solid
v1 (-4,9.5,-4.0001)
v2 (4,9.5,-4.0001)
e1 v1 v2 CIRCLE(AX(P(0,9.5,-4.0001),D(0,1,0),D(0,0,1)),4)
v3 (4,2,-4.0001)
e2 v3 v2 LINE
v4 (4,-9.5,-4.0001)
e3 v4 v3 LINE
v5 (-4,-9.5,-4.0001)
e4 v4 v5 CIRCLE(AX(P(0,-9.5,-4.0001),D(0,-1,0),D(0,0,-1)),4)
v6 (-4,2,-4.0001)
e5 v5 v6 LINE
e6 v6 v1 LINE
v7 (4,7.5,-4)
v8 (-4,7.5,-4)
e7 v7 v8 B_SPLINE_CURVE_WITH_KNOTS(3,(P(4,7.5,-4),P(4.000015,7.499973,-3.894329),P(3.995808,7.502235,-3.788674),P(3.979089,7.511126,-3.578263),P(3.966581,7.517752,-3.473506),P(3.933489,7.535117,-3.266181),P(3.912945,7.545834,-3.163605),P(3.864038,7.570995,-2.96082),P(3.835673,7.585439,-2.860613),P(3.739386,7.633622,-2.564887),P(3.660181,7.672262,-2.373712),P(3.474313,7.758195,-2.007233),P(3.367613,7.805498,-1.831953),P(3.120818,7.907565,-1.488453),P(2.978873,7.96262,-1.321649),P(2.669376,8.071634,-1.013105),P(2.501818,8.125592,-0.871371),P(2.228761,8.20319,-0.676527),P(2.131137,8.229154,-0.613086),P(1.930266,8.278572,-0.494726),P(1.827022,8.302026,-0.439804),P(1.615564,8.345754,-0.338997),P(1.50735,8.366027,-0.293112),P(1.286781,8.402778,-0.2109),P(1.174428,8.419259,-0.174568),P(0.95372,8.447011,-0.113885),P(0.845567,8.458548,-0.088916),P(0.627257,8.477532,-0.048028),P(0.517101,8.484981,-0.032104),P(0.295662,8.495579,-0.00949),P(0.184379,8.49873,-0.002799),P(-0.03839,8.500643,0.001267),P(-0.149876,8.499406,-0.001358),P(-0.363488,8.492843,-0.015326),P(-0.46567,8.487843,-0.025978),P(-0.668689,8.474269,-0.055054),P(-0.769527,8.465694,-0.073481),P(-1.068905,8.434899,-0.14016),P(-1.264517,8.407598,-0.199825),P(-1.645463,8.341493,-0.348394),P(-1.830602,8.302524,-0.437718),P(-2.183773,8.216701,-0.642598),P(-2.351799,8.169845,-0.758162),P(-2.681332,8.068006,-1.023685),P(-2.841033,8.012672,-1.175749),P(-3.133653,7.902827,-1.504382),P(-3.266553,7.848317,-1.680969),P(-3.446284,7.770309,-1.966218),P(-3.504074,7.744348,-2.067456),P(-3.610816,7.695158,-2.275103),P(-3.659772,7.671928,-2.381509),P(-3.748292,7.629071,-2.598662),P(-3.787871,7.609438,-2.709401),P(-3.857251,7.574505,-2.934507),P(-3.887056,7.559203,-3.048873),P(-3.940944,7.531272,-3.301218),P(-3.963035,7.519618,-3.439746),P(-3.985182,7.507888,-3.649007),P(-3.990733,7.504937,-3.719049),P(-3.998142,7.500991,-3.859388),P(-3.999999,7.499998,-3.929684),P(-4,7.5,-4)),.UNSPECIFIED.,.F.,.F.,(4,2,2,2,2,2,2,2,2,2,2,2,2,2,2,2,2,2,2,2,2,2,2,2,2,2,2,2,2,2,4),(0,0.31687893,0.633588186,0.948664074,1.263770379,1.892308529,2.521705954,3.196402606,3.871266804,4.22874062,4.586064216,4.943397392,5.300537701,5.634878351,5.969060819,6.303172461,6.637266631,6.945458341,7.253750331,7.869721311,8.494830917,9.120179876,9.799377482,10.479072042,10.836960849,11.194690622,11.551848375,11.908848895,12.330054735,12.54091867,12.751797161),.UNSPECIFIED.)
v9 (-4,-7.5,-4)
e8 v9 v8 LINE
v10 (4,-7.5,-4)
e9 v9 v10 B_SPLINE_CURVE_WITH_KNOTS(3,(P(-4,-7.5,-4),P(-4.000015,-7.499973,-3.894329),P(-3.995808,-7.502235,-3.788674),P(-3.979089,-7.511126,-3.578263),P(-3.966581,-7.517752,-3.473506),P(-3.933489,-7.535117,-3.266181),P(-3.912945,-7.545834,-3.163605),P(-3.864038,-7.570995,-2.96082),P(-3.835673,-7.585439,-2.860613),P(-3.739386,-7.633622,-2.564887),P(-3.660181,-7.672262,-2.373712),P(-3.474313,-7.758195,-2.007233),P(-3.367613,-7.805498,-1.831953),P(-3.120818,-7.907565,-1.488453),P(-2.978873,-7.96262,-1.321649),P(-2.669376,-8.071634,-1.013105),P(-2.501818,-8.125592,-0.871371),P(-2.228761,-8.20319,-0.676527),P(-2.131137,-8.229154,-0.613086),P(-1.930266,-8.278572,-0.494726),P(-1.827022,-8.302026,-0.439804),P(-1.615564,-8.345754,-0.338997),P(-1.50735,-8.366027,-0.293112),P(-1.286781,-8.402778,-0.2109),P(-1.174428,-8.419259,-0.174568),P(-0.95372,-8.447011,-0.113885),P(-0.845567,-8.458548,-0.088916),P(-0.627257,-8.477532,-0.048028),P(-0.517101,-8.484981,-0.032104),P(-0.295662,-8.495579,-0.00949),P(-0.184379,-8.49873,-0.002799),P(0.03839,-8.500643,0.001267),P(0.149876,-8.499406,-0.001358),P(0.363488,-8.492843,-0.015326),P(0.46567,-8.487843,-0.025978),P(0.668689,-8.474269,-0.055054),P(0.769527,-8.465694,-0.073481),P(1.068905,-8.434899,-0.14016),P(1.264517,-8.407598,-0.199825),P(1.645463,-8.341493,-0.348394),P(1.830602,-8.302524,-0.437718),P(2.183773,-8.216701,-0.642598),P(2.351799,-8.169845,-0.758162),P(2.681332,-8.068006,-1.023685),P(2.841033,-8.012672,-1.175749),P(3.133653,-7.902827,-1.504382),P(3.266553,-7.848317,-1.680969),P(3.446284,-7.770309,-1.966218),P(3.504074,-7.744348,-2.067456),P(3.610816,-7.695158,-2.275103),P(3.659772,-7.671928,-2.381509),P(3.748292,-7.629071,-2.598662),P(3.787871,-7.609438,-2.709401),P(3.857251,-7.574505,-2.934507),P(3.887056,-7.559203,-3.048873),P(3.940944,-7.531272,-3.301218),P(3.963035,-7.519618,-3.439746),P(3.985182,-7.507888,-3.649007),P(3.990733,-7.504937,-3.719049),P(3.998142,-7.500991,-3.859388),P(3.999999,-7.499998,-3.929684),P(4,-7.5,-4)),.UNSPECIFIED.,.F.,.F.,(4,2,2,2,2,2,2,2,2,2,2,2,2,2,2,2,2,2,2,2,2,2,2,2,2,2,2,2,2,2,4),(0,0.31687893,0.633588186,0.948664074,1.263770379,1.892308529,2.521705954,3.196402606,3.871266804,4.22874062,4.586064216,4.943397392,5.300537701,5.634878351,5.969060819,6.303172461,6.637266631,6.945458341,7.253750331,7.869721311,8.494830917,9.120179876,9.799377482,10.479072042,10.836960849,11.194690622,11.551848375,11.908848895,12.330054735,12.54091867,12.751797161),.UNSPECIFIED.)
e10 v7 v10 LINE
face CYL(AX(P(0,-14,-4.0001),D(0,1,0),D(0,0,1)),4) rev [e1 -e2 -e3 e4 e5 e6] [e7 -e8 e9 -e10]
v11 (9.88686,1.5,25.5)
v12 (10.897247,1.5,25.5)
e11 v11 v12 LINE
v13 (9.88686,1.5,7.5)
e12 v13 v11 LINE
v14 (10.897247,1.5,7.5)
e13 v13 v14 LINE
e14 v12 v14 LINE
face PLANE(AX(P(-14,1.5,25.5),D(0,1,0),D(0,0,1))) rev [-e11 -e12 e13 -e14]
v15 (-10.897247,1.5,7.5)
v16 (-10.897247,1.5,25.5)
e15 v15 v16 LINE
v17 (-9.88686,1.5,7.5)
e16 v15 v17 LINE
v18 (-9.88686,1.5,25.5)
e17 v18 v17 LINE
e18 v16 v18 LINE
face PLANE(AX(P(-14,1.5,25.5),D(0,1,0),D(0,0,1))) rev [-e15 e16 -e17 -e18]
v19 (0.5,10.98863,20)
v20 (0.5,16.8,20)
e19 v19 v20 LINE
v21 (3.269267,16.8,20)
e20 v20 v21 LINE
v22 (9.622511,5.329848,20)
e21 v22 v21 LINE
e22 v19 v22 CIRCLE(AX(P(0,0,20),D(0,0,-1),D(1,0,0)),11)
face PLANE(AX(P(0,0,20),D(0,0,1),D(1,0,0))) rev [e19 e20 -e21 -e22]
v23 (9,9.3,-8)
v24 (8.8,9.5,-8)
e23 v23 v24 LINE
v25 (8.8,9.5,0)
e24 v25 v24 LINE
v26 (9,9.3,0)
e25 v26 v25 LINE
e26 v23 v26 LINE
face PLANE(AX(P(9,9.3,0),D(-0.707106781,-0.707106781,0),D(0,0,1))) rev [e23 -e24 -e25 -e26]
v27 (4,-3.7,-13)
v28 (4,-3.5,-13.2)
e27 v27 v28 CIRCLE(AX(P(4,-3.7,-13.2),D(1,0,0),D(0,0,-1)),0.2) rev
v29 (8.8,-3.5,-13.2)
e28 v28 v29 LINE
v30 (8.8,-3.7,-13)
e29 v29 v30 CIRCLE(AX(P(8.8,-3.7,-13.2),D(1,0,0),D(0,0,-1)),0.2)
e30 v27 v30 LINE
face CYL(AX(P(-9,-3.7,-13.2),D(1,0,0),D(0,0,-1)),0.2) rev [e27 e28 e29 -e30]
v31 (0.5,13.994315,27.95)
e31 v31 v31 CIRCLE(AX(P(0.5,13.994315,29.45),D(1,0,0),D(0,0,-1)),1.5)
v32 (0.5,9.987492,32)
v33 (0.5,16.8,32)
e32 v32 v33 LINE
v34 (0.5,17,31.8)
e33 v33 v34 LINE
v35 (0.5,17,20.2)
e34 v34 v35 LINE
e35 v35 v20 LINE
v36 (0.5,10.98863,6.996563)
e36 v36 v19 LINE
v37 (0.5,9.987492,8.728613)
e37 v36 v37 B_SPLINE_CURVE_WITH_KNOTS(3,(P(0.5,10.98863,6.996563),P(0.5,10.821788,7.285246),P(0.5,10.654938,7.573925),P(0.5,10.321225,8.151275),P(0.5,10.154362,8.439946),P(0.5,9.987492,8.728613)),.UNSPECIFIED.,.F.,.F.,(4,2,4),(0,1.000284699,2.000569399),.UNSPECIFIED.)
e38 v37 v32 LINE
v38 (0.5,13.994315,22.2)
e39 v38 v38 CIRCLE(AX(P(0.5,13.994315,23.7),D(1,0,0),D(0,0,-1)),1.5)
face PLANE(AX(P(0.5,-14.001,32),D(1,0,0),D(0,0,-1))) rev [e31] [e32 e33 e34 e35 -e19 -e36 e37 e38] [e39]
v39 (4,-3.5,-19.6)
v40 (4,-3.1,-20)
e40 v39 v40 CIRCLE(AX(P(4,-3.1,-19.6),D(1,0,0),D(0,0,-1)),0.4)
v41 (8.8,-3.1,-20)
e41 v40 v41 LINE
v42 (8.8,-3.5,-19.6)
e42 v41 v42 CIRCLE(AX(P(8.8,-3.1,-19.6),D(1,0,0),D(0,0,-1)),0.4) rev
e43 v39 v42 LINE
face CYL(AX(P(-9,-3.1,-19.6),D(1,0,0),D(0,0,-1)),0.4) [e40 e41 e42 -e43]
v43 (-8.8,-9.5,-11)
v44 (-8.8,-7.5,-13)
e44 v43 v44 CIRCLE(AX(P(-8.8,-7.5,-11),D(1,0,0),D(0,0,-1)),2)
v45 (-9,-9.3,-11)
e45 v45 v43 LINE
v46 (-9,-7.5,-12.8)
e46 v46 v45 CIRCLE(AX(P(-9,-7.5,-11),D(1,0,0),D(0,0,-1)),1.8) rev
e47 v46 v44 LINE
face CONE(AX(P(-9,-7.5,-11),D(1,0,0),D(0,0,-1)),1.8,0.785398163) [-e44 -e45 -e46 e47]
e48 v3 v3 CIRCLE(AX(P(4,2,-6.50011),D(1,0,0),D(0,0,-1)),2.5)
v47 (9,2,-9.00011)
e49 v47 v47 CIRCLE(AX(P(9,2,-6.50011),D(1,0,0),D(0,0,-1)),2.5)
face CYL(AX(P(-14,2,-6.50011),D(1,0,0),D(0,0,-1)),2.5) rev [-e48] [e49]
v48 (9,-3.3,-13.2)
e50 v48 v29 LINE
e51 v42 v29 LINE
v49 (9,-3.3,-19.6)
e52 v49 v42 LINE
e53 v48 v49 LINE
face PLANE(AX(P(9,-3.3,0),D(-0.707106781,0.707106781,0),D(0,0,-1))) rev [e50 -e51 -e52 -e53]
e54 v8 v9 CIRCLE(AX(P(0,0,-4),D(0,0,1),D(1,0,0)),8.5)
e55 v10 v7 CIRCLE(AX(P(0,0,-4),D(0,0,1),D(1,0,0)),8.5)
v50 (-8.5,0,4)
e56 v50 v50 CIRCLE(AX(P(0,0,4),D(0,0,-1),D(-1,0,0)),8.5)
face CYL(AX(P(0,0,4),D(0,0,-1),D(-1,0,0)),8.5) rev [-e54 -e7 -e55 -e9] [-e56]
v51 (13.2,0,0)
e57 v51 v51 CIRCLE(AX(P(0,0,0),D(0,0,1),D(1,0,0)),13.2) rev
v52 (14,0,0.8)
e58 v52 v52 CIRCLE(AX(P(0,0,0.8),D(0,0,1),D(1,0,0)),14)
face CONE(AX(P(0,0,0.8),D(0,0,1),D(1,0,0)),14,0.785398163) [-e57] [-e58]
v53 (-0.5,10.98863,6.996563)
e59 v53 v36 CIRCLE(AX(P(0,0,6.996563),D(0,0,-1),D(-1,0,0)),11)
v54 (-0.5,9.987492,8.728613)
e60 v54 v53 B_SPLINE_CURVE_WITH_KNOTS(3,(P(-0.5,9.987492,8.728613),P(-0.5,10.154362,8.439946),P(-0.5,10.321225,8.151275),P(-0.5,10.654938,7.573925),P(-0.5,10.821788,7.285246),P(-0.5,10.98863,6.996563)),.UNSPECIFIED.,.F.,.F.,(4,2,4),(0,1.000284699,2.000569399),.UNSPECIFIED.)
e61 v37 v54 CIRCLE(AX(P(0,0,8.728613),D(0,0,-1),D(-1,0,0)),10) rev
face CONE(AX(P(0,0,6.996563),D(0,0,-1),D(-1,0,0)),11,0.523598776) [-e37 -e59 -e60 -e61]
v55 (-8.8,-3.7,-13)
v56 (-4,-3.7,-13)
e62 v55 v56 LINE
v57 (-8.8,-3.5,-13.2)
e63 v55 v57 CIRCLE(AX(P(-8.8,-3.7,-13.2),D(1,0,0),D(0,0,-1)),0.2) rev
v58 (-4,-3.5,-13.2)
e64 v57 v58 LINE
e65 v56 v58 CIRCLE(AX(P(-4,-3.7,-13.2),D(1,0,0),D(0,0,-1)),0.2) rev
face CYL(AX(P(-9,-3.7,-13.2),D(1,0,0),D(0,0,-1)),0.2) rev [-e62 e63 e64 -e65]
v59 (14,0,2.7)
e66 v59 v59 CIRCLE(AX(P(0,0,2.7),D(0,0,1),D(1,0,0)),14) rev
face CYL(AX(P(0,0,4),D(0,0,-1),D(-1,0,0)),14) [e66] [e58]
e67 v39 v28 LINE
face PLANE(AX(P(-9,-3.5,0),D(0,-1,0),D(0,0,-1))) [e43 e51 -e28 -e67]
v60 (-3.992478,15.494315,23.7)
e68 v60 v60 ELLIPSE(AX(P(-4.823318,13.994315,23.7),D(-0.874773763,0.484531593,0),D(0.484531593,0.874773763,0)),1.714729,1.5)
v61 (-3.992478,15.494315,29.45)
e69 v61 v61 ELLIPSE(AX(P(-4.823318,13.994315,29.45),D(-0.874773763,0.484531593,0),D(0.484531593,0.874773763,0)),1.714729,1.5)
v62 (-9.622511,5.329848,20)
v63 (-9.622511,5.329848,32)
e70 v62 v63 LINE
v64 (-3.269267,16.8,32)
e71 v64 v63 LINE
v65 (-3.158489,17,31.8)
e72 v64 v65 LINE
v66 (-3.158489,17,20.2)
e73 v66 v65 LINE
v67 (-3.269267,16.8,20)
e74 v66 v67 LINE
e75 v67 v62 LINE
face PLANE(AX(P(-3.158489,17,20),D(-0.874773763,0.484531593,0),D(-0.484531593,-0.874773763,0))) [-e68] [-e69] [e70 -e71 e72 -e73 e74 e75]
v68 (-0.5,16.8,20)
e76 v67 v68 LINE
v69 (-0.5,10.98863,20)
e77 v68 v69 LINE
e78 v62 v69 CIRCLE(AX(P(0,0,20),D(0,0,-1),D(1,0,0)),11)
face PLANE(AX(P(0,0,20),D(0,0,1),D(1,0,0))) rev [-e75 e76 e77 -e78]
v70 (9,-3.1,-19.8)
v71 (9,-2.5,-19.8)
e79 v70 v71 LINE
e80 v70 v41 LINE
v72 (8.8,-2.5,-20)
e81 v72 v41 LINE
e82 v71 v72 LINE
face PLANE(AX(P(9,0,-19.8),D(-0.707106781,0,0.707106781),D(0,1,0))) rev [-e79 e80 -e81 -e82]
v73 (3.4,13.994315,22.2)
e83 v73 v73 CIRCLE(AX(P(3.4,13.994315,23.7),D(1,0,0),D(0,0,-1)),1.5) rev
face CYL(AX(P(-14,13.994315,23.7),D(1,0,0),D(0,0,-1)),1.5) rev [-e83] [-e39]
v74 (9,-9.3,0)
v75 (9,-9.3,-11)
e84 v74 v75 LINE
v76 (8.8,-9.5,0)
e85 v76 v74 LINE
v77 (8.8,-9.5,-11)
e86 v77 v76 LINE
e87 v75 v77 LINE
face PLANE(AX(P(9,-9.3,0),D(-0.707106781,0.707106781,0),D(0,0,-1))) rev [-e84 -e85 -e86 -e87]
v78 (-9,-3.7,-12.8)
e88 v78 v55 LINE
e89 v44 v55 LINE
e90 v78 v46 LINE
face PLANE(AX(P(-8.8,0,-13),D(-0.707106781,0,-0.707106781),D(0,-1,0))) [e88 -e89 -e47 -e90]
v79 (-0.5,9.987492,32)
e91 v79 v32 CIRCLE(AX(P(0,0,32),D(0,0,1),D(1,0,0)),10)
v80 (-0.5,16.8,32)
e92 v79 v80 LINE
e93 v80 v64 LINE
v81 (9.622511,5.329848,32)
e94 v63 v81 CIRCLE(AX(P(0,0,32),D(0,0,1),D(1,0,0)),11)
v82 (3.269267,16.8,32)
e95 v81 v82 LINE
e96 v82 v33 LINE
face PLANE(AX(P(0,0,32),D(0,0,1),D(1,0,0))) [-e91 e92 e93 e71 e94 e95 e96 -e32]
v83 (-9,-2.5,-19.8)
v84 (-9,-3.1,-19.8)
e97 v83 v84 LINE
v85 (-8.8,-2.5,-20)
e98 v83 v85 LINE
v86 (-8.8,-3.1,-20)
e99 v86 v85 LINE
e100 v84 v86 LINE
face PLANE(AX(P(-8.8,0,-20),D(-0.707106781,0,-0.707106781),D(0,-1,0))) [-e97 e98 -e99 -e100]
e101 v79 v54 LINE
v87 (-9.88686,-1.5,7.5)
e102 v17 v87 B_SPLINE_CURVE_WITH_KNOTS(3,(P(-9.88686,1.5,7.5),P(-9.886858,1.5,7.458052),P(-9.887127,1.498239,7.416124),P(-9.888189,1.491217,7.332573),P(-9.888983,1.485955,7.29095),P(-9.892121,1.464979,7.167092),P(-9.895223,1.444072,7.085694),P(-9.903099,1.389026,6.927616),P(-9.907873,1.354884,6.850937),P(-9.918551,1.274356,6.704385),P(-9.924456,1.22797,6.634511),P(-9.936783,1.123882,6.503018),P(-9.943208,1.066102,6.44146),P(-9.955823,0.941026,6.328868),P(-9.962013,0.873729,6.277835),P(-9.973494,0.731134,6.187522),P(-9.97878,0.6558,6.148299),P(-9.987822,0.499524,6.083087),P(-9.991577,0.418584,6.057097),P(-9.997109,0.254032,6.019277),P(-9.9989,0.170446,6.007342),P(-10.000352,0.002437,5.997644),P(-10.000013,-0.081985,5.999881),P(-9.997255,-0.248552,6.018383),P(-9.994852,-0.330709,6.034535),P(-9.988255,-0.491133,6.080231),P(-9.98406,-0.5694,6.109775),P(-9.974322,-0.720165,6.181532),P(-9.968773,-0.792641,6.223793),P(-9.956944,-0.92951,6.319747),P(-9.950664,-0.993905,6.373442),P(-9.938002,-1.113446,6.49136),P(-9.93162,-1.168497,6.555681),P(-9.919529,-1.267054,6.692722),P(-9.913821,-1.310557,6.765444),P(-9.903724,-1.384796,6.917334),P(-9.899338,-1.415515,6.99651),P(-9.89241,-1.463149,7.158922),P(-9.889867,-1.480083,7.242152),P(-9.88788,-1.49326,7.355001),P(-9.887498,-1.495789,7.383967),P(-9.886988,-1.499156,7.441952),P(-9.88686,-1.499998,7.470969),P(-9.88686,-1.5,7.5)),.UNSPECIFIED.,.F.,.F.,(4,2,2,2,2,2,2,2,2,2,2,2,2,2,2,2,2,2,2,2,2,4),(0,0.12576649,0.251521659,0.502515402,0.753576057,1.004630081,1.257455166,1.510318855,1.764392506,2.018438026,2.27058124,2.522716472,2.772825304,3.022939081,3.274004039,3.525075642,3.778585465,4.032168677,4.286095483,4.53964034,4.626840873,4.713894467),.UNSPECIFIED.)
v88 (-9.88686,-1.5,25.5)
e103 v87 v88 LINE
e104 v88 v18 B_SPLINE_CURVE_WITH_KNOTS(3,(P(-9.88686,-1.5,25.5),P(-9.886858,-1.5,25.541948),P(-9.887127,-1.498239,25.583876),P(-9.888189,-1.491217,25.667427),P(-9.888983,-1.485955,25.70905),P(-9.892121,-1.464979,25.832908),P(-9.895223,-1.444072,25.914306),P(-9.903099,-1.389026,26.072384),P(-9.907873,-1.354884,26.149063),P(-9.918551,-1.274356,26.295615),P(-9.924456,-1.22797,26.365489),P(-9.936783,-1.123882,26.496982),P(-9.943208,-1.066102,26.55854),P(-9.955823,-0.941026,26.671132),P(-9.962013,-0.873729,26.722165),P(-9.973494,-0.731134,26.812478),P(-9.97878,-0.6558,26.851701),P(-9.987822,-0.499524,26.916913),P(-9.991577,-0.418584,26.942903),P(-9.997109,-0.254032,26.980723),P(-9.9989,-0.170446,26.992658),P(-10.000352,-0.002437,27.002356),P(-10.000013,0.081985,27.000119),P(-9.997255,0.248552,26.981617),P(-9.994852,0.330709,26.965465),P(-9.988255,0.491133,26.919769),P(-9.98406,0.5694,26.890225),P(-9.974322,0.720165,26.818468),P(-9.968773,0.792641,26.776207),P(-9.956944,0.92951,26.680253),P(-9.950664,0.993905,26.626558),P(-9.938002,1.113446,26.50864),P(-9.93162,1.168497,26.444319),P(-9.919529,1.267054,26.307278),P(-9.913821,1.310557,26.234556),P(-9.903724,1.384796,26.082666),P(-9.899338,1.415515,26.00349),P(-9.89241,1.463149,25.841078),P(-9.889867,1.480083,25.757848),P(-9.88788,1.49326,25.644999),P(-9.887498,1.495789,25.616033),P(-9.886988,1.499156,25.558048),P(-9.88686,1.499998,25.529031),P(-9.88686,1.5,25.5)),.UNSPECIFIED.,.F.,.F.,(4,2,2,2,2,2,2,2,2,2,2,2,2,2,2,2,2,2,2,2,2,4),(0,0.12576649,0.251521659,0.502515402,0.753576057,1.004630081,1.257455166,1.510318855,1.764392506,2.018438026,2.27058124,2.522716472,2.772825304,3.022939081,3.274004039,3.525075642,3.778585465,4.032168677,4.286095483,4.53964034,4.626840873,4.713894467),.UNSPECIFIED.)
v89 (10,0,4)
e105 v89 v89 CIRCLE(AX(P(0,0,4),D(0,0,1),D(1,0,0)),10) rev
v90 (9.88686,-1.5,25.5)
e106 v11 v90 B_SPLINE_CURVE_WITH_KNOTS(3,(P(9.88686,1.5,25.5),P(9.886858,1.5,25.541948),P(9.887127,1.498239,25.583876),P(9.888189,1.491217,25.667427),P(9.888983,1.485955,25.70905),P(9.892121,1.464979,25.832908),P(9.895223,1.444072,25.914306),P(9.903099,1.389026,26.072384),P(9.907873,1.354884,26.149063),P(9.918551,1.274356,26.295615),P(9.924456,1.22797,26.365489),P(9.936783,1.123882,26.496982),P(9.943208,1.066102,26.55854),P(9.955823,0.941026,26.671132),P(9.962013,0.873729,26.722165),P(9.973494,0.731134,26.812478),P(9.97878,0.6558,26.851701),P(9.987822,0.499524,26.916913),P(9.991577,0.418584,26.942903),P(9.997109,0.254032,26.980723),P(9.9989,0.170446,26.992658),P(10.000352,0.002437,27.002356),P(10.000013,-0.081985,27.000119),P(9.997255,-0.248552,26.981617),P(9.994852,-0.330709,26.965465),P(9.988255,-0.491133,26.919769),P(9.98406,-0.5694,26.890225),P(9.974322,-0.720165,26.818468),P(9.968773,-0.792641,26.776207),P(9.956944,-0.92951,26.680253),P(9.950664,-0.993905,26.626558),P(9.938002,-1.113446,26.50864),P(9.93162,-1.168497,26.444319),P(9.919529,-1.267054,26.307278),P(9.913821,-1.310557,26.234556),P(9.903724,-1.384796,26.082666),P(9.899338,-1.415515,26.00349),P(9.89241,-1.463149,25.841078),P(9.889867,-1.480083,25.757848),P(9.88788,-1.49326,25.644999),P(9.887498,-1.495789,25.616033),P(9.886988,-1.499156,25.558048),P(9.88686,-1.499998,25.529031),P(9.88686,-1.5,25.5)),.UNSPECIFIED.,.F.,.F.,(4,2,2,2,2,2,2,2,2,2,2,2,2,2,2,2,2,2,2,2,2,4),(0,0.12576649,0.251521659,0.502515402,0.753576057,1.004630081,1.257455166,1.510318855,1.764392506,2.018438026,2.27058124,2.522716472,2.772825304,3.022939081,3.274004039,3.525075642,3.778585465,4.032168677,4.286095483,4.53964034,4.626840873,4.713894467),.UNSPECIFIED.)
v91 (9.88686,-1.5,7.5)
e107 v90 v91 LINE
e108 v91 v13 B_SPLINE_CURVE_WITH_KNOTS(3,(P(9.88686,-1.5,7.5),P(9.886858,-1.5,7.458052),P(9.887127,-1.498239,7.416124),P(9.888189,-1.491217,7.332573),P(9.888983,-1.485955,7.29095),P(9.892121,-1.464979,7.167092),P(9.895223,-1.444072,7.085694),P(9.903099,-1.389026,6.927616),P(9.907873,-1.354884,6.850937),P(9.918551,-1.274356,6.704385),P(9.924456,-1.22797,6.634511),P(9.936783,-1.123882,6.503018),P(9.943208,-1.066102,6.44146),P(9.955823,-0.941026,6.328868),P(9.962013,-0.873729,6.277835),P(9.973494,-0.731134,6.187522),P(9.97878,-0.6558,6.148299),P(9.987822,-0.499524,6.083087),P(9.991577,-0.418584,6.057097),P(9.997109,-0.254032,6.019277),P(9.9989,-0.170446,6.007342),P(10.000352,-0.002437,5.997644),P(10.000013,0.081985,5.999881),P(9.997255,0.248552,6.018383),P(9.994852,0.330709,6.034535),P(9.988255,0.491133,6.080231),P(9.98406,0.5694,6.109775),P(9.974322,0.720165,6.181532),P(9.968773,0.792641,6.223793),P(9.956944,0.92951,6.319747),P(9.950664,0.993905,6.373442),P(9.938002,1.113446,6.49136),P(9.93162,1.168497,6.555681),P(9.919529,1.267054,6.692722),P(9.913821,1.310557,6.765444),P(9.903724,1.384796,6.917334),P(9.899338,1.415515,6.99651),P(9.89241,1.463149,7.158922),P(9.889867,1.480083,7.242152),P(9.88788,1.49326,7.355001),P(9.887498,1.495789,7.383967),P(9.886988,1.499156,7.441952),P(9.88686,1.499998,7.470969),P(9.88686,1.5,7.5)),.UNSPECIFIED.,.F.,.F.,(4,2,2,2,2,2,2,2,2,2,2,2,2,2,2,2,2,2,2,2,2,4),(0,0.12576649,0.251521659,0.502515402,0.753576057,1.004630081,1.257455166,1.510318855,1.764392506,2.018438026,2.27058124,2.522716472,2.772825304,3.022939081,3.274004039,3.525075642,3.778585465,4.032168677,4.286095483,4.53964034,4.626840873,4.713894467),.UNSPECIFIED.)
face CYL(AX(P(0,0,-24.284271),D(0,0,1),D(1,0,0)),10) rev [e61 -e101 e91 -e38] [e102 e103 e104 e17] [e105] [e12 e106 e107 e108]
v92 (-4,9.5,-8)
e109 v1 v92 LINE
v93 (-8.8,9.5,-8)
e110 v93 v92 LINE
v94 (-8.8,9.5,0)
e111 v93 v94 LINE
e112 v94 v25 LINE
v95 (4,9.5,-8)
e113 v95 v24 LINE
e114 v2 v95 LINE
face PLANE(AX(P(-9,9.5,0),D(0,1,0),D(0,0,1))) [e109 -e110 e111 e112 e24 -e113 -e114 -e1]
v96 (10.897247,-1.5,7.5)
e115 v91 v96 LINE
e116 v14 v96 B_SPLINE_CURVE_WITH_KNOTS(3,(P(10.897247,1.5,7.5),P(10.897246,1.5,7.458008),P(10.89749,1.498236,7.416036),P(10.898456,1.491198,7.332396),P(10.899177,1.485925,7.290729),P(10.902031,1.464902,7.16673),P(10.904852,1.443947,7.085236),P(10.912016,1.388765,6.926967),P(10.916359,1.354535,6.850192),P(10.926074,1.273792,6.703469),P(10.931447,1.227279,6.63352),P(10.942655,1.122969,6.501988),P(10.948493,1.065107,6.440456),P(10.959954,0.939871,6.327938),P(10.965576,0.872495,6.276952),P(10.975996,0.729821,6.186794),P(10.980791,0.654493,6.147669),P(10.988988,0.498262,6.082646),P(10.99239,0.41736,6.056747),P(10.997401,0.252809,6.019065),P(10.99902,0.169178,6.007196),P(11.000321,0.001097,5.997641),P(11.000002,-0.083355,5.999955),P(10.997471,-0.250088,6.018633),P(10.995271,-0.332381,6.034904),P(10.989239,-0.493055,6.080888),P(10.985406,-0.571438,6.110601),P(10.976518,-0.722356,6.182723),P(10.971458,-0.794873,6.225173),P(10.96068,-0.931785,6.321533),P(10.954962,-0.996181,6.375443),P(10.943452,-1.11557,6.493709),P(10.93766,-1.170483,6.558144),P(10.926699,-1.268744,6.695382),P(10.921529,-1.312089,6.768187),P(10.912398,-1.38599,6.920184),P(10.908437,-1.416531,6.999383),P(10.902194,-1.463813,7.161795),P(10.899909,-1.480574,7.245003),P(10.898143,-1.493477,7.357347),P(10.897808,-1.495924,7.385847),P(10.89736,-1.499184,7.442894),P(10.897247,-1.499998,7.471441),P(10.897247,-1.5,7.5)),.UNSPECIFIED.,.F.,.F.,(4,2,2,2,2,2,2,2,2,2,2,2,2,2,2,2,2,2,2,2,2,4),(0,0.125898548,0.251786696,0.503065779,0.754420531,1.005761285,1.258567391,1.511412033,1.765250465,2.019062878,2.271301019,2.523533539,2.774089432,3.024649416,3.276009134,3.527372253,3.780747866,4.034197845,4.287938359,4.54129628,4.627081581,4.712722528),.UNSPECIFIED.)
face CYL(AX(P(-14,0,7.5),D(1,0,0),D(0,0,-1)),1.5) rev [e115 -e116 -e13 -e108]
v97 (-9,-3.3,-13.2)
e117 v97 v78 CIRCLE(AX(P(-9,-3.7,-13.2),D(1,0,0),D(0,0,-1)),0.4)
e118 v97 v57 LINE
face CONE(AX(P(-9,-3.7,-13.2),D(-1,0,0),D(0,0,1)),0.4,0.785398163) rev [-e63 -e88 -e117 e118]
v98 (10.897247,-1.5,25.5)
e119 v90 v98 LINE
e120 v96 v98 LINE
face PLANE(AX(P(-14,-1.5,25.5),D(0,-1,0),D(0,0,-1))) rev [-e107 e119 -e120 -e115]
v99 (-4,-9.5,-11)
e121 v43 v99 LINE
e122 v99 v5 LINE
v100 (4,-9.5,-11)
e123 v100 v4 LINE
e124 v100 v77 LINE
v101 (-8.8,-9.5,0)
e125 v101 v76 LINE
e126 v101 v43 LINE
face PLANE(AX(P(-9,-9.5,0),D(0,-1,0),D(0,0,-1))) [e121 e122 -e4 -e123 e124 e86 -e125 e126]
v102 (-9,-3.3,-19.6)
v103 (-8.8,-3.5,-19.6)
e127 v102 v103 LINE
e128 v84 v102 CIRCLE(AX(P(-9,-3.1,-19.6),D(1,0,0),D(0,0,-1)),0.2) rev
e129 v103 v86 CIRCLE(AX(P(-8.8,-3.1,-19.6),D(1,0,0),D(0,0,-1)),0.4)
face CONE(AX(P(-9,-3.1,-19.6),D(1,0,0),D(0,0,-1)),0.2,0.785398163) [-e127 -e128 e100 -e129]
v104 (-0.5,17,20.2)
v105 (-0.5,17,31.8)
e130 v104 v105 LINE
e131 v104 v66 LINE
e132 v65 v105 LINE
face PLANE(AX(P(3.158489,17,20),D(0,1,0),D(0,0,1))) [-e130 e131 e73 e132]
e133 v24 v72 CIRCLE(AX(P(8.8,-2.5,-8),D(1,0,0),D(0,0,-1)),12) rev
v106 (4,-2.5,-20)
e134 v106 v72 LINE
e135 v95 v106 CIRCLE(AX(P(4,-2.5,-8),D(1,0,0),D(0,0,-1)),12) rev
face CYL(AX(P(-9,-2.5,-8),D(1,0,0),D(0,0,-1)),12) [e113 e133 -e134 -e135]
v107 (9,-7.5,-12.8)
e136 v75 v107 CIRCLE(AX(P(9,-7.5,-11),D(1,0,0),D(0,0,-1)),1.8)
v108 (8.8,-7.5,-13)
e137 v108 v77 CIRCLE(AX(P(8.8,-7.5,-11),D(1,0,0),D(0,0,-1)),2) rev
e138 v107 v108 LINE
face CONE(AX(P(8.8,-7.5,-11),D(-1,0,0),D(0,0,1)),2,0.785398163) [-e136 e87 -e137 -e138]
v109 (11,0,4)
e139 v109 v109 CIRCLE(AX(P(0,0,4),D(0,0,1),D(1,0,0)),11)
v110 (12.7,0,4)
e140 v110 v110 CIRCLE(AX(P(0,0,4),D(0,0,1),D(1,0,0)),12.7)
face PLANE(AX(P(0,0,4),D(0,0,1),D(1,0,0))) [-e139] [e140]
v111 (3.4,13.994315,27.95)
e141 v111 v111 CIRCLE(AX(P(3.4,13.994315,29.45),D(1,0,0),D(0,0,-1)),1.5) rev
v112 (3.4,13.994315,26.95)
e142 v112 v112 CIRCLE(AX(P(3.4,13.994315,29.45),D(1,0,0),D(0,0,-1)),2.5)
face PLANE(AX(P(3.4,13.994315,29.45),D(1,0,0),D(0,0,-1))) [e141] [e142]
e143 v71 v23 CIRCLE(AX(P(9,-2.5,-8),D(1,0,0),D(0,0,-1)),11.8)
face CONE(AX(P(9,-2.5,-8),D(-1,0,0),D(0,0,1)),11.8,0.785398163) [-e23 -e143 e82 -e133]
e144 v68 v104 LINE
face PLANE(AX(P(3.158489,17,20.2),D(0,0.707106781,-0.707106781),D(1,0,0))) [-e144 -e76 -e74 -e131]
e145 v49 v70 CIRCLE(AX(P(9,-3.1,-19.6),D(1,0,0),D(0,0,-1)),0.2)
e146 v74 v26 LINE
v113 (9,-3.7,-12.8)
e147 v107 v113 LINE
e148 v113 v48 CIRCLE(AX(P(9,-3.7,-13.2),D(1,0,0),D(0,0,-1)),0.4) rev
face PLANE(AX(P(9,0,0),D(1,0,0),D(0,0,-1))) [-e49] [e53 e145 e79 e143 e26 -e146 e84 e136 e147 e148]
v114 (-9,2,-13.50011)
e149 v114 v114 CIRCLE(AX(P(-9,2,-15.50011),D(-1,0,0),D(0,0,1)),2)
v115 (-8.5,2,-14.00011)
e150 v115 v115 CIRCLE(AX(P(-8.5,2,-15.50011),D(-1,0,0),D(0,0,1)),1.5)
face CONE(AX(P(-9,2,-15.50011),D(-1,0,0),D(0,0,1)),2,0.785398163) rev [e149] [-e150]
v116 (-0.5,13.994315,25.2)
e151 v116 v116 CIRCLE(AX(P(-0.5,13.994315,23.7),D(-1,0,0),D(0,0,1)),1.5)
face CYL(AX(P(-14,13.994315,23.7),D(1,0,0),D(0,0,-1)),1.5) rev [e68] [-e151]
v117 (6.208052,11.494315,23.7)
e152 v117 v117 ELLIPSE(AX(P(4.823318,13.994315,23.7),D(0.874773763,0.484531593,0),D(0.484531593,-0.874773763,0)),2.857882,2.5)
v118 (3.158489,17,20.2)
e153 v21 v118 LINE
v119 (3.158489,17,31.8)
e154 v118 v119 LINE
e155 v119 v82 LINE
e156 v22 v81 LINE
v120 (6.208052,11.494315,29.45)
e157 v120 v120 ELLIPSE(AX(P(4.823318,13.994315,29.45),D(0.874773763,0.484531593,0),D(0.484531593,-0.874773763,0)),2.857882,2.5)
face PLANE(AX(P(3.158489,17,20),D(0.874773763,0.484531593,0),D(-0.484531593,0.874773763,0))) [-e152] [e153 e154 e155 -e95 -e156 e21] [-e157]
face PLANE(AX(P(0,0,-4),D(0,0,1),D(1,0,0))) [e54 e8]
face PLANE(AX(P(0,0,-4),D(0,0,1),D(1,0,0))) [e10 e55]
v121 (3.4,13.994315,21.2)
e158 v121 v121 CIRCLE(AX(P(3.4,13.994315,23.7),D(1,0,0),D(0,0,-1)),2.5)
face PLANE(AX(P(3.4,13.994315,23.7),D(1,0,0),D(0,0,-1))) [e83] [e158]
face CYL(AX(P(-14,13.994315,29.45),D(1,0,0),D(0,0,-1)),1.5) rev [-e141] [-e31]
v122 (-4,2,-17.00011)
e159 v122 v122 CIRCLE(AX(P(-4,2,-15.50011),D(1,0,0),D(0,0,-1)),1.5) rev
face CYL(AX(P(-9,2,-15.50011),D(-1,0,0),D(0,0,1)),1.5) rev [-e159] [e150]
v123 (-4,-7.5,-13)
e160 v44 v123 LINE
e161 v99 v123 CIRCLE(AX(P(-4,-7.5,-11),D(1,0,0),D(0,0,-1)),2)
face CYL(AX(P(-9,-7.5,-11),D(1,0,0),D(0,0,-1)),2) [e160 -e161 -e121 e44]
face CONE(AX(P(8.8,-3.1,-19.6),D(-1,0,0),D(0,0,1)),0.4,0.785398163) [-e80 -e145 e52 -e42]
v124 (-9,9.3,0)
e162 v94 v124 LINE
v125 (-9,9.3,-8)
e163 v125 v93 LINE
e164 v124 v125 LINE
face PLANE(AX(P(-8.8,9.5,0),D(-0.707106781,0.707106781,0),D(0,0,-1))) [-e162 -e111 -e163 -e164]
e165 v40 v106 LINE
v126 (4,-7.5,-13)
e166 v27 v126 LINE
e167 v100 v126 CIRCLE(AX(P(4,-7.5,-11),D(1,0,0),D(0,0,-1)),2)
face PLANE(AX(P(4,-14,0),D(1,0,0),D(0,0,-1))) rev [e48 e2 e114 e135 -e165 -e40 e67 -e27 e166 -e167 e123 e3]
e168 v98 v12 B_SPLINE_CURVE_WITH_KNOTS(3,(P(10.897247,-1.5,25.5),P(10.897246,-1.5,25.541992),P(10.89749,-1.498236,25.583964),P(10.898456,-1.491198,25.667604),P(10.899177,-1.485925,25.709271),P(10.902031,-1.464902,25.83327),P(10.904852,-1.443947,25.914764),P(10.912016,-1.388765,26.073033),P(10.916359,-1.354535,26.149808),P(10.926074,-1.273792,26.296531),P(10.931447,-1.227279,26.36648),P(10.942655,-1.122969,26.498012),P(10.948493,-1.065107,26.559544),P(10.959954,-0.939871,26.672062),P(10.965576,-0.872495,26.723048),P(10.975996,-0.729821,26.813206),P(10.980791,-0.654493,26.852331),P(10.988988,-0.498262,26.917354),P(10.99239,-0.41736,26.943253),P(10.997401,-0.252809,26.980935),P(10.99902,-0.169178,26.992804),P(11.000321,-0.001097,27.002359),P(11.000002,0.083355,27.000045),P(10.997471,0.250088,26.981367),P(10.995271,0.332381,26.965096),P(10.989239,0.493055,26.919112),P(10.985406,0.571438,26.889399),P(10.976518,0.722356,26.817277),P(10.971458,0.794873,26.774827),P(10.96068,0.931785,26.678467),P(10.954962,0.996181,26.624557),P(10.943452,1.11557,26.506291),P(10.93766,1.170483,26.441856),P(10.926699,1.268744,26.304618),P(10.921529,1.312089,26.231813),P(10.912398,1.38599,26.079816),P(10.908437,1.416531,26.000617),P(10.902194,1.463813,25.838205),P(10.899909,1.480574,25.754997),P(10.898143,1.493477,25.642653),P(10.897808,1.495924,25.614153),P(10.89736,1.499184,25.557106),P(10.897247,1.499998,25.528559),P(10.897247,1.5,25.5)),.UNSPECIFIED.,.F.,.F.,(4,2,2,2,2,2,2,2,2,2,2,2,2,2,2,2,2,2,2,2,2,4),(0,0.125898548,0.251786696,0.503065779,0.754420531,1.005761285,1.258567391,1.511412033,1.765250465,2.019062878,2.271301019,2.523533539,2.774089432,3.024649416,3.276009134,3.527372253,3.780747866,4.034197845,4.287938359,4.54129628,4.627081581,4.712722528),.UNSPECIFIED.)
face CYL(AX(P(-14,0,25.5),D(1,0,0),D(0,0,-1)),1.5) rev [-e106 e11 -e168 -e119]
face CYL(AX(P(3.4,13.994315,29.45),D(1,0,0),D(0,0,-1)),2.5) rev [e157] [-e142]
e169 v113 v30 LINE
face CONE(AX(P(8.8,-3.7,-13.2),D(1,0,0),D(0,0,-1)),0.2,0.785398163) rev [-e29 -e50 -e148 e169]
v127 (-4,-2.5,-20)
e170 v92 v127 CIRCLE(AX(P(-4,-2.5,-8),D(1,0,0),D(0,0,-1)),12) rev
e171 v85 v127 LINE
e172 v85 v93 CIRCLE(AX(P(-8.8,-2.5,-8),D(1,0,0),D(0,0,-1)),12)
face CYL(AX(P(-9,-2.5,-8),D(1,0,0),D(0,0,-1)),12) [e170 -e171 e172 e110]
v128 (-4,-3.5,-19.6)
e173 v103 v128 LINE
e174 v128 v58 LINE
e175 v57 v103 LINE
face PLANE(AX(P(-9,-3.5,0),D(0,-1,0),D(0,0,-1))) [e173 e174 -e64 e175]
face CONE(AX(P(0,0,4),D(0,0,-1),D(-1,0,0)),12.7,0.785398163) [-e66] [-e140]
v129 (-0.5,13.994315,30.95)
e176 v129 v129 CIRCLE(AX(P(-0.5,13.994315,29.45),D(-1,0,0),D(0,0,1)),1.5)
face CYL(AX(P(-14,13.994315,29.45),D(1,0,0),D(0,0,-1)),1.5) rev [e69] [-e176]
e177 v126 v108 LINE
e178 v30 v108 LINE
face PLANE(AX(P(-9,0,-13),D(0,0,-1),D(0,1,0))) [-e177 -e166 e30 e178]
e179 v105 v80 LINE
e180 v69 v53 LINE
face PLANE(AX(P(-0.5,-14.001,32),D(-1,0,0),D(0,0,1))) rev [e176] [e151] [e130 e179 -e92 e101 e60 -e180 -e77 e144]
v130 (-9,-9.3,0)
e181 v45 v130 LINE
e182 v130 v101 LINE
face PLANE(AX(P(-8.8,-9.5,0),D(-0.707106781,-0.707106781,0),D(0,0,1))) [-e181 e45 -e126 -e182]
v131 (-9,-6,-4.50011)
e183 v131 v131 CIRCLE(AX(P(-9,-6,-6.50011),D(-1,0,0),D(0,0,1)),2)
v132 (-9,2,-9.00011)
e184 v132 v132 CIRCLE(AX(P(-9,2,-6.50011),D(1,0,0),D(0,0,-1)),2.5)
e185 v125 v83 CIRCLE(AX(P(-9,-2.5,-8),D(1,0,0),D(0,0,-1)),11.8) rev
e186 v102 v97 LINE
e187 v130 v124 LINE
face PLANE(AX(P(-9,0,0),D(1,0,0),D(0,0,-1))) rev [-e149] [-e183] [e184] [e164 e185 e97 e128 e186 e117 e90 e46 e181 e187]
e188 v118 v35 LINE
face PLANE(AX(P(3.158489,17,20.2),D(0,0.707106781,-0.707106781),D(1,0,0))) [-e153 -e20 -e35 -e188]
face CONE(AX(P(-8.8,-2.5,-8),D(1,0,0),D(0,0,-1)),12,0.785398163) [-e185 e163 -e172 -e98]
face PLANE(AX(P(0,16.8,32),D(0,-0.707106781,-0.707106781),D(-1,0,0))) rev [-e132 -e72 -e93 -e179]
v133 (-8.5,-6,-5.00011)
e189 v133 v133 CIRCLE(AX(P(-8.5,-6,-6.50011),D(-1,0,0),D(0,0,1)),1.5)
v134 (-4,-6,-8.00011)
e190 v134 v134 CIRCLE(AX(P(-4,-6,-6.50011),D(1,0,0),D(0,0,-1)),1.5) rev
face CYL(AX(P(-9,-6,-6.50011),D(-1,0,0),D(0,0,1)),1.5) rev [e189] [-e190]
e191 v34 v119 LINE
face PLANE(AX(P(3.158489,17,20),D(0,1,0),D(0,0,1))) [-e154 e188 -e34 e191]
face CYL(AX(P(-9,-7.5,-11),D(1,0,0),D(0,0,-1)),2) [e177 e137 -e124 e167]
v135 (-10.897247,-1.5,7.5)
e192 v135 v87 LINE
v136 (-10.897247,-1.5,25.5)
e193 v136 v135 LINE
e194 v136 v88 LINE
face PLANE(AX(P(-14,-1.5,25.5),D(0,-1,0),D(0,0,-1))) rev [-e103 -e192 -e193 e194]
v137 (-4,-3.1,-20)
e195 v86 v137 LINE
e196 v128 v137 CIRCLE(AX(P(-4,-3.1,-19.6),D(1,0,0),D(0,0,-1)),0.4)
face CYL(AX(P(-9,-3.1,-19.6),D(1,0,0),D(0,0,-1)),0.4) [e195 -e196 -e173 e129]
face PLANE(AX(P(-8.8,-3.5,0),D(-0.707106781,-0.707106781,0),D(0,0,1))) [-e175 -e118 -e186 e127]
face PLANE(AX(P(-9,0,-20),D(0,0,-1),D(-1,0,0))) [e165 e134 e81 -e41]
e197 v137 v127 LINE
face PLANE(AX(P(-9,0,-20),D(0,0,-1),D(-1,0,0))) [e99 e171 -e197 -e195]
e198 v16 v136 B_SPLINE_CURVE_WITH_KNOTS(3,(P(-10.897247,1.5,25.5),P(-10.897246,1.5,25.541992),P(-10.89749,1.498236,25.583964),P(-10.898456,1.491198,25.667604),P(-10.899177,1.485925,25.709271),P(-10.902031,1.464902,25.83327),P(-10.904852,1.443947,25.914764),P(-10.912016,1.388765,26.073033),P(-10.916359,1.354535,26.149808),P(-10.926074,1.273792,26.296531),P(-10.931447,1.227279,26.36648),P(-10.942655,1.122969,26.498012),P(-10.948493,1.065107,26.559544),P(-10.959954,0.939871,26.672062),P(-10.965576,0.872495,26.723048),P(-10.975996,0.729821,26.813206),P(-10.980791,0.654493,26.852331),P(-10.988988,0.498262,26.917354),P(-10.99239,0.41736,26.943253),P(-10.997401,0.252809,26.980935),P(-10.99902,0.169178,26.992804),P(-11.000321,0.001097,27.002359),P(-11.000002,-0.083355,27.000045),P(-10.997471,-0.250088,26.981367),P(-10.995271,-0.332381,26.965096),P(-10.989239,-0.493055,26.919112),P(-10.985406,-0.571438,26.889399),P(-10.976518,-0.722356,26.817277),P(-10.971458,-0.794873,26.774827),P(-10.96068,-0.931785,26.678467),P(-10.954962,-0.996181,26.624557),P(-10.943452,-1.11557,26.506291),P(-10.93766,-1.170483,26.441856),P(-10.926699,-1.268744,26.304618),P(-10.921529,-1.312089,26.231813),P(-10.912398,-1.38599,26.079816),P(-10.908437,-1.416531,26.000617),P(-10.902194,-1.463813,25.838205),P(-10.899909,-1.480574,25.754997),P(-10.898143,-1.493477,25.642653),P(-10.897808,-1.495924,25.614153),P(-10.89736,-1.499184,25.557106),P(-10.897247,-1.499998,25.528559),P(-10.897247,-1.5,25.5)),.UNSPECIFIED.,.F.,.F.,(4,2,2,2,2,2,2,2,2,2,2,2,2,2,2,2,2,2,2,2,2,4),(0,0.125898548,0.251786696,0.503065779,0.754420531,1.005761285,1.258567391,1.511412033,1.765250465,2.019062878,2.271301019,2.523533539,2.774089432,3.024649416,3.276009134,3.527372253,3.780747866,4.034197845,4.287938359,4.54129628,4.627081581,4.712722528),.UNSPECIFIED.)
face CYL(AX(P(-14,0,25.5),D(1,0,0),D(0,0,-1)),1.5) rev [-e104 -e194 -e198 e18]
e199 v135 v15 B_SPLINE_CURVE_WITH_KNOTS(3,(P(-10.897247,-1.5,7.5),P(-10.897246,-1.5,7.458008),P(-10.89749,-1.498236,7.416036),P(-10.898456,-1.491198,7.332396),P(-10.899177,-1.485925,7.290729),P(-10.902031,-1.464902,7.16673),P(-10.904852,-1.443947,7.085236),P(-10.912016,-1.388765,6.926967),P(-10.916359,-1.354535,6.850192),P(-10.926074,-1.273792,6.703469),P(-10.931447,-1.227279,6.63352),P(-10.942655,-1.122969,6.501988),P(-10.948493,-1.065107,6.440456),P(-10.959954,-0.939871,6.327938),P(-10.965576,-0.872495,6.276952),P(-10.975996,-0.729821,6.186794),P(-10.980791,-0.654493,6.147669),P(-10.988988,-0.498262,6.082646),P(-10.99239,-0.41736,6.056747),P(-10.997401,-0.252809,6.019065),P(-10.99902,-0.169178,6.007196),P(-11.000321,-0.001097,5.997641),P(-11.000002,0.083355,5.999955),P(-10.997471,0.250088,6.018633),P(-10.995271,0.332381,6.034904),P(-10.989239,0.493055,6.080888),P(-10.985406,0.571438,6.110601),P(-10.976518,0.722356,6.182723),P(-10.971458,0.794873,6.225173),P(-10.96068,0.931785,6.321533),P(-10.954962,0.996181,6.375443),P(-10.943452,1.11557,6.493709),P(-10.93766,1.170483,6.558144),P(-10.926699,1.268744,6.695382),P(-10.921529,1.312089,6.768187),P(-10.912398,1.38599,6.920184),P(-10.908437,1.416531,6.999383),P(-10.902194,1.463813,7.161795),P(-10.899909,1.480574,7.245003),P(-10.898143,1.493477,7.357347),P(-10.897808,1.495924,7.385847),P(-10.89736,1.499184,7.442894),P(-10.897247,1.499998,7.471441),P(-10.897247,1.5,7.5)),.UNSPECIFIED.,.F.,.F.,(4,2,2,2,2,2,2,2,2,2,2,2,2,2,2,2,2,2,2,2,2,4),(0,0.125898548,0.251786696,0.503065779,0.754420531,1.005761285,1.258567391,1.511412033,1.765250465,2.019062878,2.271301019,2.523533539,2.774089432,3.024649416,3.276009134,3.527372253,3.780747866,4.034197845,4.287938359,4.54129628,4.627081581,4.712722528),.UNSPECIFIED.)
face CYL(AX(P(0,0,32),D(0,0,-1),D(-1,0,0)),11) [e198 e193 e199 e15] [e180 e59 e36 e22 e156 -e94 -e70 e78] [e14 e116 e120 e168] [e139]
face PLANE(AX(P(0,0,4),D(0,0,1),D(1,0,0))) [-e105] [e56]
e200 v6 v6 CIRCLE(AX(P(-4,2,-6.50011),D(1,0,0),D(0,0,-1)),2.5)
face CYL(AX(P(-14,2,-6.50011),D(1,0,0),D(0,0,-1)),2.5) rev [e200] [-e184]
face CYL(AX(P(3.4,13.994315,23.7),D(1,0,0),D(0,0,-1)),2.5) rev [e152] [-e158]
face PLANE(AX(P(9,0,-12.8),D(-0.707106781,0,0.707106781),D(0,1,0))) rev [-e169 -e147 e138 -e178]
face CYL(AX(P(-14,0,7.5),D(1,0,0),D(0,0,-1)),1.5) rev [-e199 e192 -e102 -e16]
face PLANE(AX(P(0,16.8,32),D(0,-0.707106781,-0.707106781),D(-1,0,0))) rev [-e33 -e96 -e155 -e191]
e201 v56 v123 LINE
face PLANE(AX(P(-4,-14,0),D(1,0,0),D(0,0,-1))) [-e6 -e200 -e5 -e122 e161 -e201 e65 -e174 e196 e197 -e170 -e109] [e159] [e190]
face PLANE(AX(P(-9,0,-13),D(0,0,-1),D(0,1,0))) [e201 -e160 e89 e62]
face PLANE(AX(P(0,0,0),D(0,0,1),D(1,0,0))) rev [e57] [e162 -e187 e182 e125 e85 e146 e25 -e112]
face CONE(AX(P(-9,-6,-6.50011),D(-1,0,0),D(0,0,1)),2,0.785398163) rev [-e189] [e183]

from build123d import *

# Parameters (mm, degrees)
SKETCH1_R                                           = 14
BOSS_EXTRUDE1_DEPTH                                 = 4
SKETCH2_R                                           = 8.5
CUT_EXTRUDE1_DEPTH                                  = 21.199009877
SKETCH3_R                                           = 11
BOSS_EXTRUDE2_DEPTH                                 = 28
SKETCH4_R                                           = 10
CUT_EXTRUDE2_DEPTH                                  = 28
BOSS_EXTRUDE3_START                                 = -12
BOSS_EXTRUDE3_DEPTH                                 = 12
BOSS_EXTRUDE4_DEPTH                                 = 9
BOSS_EXTRUDE4_DEPTH_BACK                            = 9
CUT_EXTRUDE7_START                                  = -19
CUT_EXTRUDE7_DEPTH                                  = 19
CUT_EXTRUDE8_REACH                                  = 48.701
CUT_EXTRUDE8_END_RADIUS                             = 10
SKETCH8_W                                           = 1
SKETCH8_H                                           = 21.539335767
CUT_EXTRUDE9_START                                  = -4
SKETCH9_R                                           = 8.5
CUT_EXTRUDE9_DEPTH                                  = 4
CHAMFER1_SIZE                                       = 1.3
CHAMFER2_SIZE                                       = 0.8
CHAMFER4_SIZE                                       = 0.2
CHAMFER5_SIZE                                       = 0.2
CHAMFER6_SIZE                                       = 3.464101615
CHAMFER6_SIZE_2                                     = 2
CUT_EXTRUDE10_DEPTH                                 = 39.845849199
CUT_EXTRUDE10_DEPTH_BACK                            = 39.845849199
CUT_EXTRUDE12_DEPTH                                 = 39.845849281
CUT_EXTRUDE12_DEPTH_BACK                            = 39.845849281
SKETCH11_R                                          = 2.5
CSK_FOR_M3_COUNTERSUNK_FLAT_HEAD_SCREW1_D           = 3
CSK_FOR_M3_COUNTERSUNK_FLAT_HEAD_SCREW1_DEPTH       = 5
CSK_FOR_M3_COUNTERSUNK_FLAT_HEAD_SCREW1_CSINK_D     = 4
CSK_FOR_M3_COUNTERSUNK_FLAT_HEAD_SCREW1_CSINK_ANGLE = 90
CSK_FOR_M3_COUNTERSUNK_FLAT_HEAD_SCREW1_TIP         = 0.901290929
CUT_EXTRUDE13_DEPTH                                 = 39.845849281
CUT_EXTRUDE13_DEPTH_BACK                            = 39.845849281
SKETCH15_R                                          = 1.5
SKETCH16_R                                          = 2.5
CUT_EXTRUDE14_DEPTH                                 = 6.6


# Read off the part's stored shape, not the designer's step: Cut-Extrude7
with BuildPart() as part:
    # Sketch1 → Boss-Extrude1 (new body)
    with BuildSketch(Plane.XY):
        Circle(SKETCH1_R)
    extrude(amount=BOSS_EXTRUDE1_DEPTH)

    # Sketch2 → Cut-Extrude1 (cut, through all)
    with BuildSketch(Plane(origin=(0, 0, 0), x_dir=(-1, 0, 0), z_dir=(0, 0, -1))):
        Circle(SKETCH2_R)
    extrude(amount=-CUT_EXTRUDE1_DEPTH, mode=Mode.SUBTRACT)

    # Sketch3 → Boss-Extrude2 (add)
    with BuildSketch(Plane.XY.offset(4)):
        Circle(SKETCH3_R)
    extrude(amount=BOSS_EXTRUDE2_DEPTH)

    # Sketch4 → Cut-Extrude2 (cut)
    with BuildSketch(Plane.XY.offset(32)):
        Circle(SKETCH4_R)
    extrude(amount=-CUT_EXTRUDE2_DEPTH, mode=Mode.SUBTRACT)

    # Sketch5 → Boss-Extrude3 (add)
    with BuildSketch(Plane.XY.offset(32).offset(BOSS_EXTRUDE3_START)):
        with BuildLine():
            Line((3.158488565, 17), (-3.158488565, 17))
            Line((-3.158488565, 17), (-9.622511389, 5.329847518))
            ThreePointArc((-9.622511389, 5.329847518), (0, 11), (9.622511389, 5.329847518))
            Line((9.622511389, 5.329847518), (3.158488565, 17))
        make_face()
    extrude(amount=BOSS_EXTRUDE3_DEPTH)

    # Sketch6 → Boss-Extrude4 (add, two sides: drawn at the far end of the back side and taken through both)
    with BuildSketch(Plane(origin=(0, 0, 0), x_dir=(0, 0, -1), z_dir=(1, 0, 0)).offset(-BOSS_EXTRUDE4_DEPTH_BACK)):
        with BuildLine():
            Line((0, 9.5), (0, -9.5))
            Line((0, -9.5), (11, -9.5))
            ThreePointArc((11, -9.5), (12.414213562, -8.914213562), (13, -7.5))
            Line((13, -7.5), (13, -3.7))
            ThreePointArc((13, -3.7), (13.058578644, -3.558578644), (13.2, -3.5))
            Line((13.2, -3.5), (19.6, -3.5))
            ThreePointArc((19.6, -3.5), (19.882842712, -3.382842712), (20, -3.1))
            Line((20, -3.1), (20, -2.5))
            ThreePointArc((20, -2.5), (16.485281374, 5.985281374), (8, 9.5))
            Line((8, 9.5), (0, 9.5))
        make_face()
    extrude(amount=BOSS_EXTRUDE4_DEPTH + BOSS_EXTRUDE4_DEPTH_BACK)

    # Cut-Extrude7 outline → Cut-Extrude7 (cut)
    with BuildSketch(Plane(origin=(0, 9.5, 0), x_dir=(1, 0, 0), z_dir=(0, 1, 0)).offset(CUT_EXTRUDE7_START)):
        with BuildLine():
            ThreePointArc((-4, 4.0001), (0, 0.0001), (4, 4.0001))
            Line((4, 4.0001), (4, 20))
            Line((4, 20), (-4, 20))
            Line((-4, 20), (-4, 4.0001))
        make_face()
    extrude(amount=CUT_EXTRUDE7_DEPTH, mode=Mode.SUBTRACT)

    # Cut-Extrude8: up to this cylinder (the profile starts outside it)
    cut_extrude8_end = Plane(origin=(0, 0, 21.230332), z_dir=(0, 0, 1)) * Cylinder(CUT_EXTRUDE8_END_RADIUS, 118.402, mode=Mode.PRIVATE)
    # Sketch8 → Cut-Extrude8 (cut, up to the surface)
    with BuildSketch(Plane(origin=(0, 17, 0), x_dir=(1, 0, 0), z_dir=(0, 1, 0)), mode=Mode.PRIVATE) as cut_extrude8_sk1:
        with Locations((0, -21.230332117)):
            Rectangle(SKETCH8_W, SKETCH8_H)
    cut_extrude8_tool1 = extrude(cut_extrude8_sk1.sketch, amount=-CUT_EXTRUDE8_REACH, mode=Mode.PRIVATE) - cut_extrude8_end
    add(cut_extrude8_tool1.solids().sort_by_distance((0, 17, 21.230332))[0], mode=Mode.SUBTRACT)

    # Sketch9 → Cut-Extrude9 (cut)
    with BuildSketch(Plane.XY.offset(CUT_EXTRUDE9_START)):
        with Locations(Location((0, 0, 0), (0, 0, 180))):
            Circle(SKETCH9_R)
    extrude(amount=CUT_EXTRUDE9_DEPTH, mode=Mode.SUBTRACT)

    # Chamfer1
    chamfer1_edges = [part.edges().sort_by_distance(p)[0] for p in [
        (-14, 0, 4),
    ]]
    chamfer(chamfer1_edges, length=CHAMFER1_SIZE)

    # Chamfer2
    chamfer2_edges = [part.edges().sort_by_distance(p)[0] for p in [
        (-14, 0, 0),
    ]]
    chamfer(chamfer2_edges, length=CHAMFER2_SIZE)

    # Chamfer4
    chamfer4_edges = [part.edges().sort_by_distance(p)[0] for p in [
        (9, -3.382842712, -19.882842712),
        (-9, -3.5, -16.4),
        (9, -3.558578644, -13.058578644),
        (-9, -5.6, -13),
        (9, -8.914213562, -12.414213562),
        (-9, -9.5, -5.5),
        (-9, 9.5, -4),
        (-9, 5.985281374, -16.485281374),
        (-9, -2.8, -20),
        (-9, -3.382842712, -19.882842712),
        (-9, -3.558578644, -13.058578644),
        (-9, -8.914213562, -12.414213562),
        (9, -2.8, -20),
        (9, 5.985281374, -16.485281374),
        (9, 9.5, -4),
        (9, -9.5, -5.5),
        (9, -5.6, -13),
        (9, -3.5, -16.4),
    ]]
    chamfer(chamfer4_edges, length=CHAMFER4_SIZE)

    # Chamfer5
    chamfer5_edges = [part.edges().sort_by_distance(p)[0] for p in [
        (-1.829244283, 17, 20),
        (-1.829244283, 17, 32),
        (1.829244283, 17, 20),
        (1.829244283, 17, 32),
    ]]
    chamfer(chamfer5_edges, length=CHAMFER5_SIZE)

    # Chamfer6
    # the kernel refuses this chamfer: 3.464101615, 2 mm, written as the material it takes off along each edge
    with BuildSketch(Plane(origin=(0, 0, 10.460664233), x_dir=(-0.757967837141711, 0.6522919268691869, 0), z_dir=(-0.6522919268691869, -0.757967837141711, 0))) as chamfer6_piece_1_section:
        Polygon((11, CHAMFER6_SIZE), (11 - CHAMFER6_SIZE_2, 0), (11, 0), align=None)
    chamfer6_piece_1 = revolve(axis=Axis((0, 0, 10.460664233), (0, 0, -1)), revolution_arc=98.570745894, mode=Mode.PRIVATE)
    chamfer6_piece_1 = split(chamfer6_piece_1, bisect_by=Plane(origin=(-0.5, 10.551597033, 9.113518596), z_dir=(1, 0, 0)), keep=Keep.TOP, mode=Mode.PRIVATE)
    chamfer6_piece_1 = split(chamfer6_piece_1, bisect_by=Plane(origin=(0.5, 10.551597033, 9.113518596), z_dir=(-1, 0, 0)), keep=Keep.TOP, mode=Mode.PRIVATE)
    add(chamfer6_piece_1, mode=Mode.SUBTRACT)

    # Sketch10 → Cut-Extrude10 (cut, two sides: drawn at the far end of the back side and taken through both)
    with BuildSketch(Plane(origin=(0, 0, 0), x_dir=(0, 0, -1), z_dir=(1, 0, 0)).offset(-CUT_EXTRUDE10_DEPTH_BACK)):
        with BuildLine():
            Line((-25.5, 1.5), (-7.5, 1.5))
            ThreePointArc((-7.5, 1.5), (-6, 0), (-7.5, -1.5))
            Line((-7.5, -1.5), (-25.5, -1.5))
            ThreePointArc((-25.5, -1.5), (-27, 0), (-25.5, 1.5))
        make_face()
    extrude(amount=CUT_EXTRUDE10_DEPTH + CUT_EXTRUDE10_DEPTH_BACK, mode=Mode.SUBTRACT)

    # Sketch11 → Cut-Extrude12 (cut, two sides: drawn at the far end of the back side and taken through both)
    with BuildSketch(Plane(origin=(0, 0, 0), x_dir=(0, 0, -1), z_dir=(1, 0, 0)).offset(-CUT_EXTRUDE12_DEPTH_BACK)):
        with Locations((6.50011, 2)):
            Circle(SKETCH11_R)
    extrude(amount=CUT_EXTRUDE12_DEPTH + CUT_EXTRUDE12_DEPTH_BACK, mode=Mode.SUBTRACT)

    # CSK for M3 Countersunk Flat Head Screw1
    with Locations(Plane.ZY.offset(9)):
        with Locations((-6.50011, -6), (-15.50011, 2)):
            CounterSinkHole(CSK_FOR_M3_COUNTERSUNK_FLAT_HEAD_SCREW1_D / 2, CSK_FOR_M3_COUNTERSUNK_FLAT_HEAD_SCREW1_CSINK_D / 2, depth=CSK_FOR_M3_COUNTERSUNK_FLAT_HEAD_SCREW1_DEPTH, counter_sink_angle=CSK_FOR_M3_COUNTERSUNK_FLAT_HEAD_SCREW1_CSINK_ANGLE)
            with Locations((0, 0, -(CSK_FOR_M3_COUNTERSUNK_FLAT_HEAD_SCREW1_DEPTH + CSK_FOR_M3_COUNTERSUNK_FLAT_HEAD_SCREW1_TIP / 2))):  # 118° drill point
                Cone(0, CSK_FOR_M3_COUNTERSUNK_FLAT_HEAD_SCREW1_D / 2, CSK_FOR_M3_COUNTERSUNK_FLAT_HEAD_SCREW1_TIP, mode=Mode.SUBTRACT)

    # Sketch15 → Cut-Extrude13 (cut, two sides: drawn at the far end of the back side and taken through both)
    with BuildSketch(Plane(origin=(0, 0, 0), x_dir=(0, 0, -1), z_dir=(1, 0, 0)).offset(-CUT_EXTRUDE13_DEPTH_BACK)):
        with Locations(Location((-29.45, 13.994315244, 0), (0, 0, 90))):
            Circle(SKETCH15_R)
        with Locations(Location((-23.7, 13.994315244, 0), (0, 0, 90))):
            Circle(SKETCH15_R)
    extrude(amount=CUT_EXTRUDE13_DEPTH + CUT_EXTRUDE13_DEPTH_BACK, mode=Mode.SUBTRACT)

    # Sketch16 → Cut-Extrude14 (cut)
    with BuildSketch(Plane(origin=(10, 0, 0), x_dir=(0, 0, -1), z_dir=(1, 0, 0))):
        with Locations((-29.45, 13.994315244)):
            Circle(SKETCH16_R)
        with Locations((-23.7, 13.994315244)):
            Circle(SKETCH16_R)
    extrude(amount=-CUT_EXTRUDE14_DEPTH, mode=Mode.SUBTRACT)


solid = part.part
